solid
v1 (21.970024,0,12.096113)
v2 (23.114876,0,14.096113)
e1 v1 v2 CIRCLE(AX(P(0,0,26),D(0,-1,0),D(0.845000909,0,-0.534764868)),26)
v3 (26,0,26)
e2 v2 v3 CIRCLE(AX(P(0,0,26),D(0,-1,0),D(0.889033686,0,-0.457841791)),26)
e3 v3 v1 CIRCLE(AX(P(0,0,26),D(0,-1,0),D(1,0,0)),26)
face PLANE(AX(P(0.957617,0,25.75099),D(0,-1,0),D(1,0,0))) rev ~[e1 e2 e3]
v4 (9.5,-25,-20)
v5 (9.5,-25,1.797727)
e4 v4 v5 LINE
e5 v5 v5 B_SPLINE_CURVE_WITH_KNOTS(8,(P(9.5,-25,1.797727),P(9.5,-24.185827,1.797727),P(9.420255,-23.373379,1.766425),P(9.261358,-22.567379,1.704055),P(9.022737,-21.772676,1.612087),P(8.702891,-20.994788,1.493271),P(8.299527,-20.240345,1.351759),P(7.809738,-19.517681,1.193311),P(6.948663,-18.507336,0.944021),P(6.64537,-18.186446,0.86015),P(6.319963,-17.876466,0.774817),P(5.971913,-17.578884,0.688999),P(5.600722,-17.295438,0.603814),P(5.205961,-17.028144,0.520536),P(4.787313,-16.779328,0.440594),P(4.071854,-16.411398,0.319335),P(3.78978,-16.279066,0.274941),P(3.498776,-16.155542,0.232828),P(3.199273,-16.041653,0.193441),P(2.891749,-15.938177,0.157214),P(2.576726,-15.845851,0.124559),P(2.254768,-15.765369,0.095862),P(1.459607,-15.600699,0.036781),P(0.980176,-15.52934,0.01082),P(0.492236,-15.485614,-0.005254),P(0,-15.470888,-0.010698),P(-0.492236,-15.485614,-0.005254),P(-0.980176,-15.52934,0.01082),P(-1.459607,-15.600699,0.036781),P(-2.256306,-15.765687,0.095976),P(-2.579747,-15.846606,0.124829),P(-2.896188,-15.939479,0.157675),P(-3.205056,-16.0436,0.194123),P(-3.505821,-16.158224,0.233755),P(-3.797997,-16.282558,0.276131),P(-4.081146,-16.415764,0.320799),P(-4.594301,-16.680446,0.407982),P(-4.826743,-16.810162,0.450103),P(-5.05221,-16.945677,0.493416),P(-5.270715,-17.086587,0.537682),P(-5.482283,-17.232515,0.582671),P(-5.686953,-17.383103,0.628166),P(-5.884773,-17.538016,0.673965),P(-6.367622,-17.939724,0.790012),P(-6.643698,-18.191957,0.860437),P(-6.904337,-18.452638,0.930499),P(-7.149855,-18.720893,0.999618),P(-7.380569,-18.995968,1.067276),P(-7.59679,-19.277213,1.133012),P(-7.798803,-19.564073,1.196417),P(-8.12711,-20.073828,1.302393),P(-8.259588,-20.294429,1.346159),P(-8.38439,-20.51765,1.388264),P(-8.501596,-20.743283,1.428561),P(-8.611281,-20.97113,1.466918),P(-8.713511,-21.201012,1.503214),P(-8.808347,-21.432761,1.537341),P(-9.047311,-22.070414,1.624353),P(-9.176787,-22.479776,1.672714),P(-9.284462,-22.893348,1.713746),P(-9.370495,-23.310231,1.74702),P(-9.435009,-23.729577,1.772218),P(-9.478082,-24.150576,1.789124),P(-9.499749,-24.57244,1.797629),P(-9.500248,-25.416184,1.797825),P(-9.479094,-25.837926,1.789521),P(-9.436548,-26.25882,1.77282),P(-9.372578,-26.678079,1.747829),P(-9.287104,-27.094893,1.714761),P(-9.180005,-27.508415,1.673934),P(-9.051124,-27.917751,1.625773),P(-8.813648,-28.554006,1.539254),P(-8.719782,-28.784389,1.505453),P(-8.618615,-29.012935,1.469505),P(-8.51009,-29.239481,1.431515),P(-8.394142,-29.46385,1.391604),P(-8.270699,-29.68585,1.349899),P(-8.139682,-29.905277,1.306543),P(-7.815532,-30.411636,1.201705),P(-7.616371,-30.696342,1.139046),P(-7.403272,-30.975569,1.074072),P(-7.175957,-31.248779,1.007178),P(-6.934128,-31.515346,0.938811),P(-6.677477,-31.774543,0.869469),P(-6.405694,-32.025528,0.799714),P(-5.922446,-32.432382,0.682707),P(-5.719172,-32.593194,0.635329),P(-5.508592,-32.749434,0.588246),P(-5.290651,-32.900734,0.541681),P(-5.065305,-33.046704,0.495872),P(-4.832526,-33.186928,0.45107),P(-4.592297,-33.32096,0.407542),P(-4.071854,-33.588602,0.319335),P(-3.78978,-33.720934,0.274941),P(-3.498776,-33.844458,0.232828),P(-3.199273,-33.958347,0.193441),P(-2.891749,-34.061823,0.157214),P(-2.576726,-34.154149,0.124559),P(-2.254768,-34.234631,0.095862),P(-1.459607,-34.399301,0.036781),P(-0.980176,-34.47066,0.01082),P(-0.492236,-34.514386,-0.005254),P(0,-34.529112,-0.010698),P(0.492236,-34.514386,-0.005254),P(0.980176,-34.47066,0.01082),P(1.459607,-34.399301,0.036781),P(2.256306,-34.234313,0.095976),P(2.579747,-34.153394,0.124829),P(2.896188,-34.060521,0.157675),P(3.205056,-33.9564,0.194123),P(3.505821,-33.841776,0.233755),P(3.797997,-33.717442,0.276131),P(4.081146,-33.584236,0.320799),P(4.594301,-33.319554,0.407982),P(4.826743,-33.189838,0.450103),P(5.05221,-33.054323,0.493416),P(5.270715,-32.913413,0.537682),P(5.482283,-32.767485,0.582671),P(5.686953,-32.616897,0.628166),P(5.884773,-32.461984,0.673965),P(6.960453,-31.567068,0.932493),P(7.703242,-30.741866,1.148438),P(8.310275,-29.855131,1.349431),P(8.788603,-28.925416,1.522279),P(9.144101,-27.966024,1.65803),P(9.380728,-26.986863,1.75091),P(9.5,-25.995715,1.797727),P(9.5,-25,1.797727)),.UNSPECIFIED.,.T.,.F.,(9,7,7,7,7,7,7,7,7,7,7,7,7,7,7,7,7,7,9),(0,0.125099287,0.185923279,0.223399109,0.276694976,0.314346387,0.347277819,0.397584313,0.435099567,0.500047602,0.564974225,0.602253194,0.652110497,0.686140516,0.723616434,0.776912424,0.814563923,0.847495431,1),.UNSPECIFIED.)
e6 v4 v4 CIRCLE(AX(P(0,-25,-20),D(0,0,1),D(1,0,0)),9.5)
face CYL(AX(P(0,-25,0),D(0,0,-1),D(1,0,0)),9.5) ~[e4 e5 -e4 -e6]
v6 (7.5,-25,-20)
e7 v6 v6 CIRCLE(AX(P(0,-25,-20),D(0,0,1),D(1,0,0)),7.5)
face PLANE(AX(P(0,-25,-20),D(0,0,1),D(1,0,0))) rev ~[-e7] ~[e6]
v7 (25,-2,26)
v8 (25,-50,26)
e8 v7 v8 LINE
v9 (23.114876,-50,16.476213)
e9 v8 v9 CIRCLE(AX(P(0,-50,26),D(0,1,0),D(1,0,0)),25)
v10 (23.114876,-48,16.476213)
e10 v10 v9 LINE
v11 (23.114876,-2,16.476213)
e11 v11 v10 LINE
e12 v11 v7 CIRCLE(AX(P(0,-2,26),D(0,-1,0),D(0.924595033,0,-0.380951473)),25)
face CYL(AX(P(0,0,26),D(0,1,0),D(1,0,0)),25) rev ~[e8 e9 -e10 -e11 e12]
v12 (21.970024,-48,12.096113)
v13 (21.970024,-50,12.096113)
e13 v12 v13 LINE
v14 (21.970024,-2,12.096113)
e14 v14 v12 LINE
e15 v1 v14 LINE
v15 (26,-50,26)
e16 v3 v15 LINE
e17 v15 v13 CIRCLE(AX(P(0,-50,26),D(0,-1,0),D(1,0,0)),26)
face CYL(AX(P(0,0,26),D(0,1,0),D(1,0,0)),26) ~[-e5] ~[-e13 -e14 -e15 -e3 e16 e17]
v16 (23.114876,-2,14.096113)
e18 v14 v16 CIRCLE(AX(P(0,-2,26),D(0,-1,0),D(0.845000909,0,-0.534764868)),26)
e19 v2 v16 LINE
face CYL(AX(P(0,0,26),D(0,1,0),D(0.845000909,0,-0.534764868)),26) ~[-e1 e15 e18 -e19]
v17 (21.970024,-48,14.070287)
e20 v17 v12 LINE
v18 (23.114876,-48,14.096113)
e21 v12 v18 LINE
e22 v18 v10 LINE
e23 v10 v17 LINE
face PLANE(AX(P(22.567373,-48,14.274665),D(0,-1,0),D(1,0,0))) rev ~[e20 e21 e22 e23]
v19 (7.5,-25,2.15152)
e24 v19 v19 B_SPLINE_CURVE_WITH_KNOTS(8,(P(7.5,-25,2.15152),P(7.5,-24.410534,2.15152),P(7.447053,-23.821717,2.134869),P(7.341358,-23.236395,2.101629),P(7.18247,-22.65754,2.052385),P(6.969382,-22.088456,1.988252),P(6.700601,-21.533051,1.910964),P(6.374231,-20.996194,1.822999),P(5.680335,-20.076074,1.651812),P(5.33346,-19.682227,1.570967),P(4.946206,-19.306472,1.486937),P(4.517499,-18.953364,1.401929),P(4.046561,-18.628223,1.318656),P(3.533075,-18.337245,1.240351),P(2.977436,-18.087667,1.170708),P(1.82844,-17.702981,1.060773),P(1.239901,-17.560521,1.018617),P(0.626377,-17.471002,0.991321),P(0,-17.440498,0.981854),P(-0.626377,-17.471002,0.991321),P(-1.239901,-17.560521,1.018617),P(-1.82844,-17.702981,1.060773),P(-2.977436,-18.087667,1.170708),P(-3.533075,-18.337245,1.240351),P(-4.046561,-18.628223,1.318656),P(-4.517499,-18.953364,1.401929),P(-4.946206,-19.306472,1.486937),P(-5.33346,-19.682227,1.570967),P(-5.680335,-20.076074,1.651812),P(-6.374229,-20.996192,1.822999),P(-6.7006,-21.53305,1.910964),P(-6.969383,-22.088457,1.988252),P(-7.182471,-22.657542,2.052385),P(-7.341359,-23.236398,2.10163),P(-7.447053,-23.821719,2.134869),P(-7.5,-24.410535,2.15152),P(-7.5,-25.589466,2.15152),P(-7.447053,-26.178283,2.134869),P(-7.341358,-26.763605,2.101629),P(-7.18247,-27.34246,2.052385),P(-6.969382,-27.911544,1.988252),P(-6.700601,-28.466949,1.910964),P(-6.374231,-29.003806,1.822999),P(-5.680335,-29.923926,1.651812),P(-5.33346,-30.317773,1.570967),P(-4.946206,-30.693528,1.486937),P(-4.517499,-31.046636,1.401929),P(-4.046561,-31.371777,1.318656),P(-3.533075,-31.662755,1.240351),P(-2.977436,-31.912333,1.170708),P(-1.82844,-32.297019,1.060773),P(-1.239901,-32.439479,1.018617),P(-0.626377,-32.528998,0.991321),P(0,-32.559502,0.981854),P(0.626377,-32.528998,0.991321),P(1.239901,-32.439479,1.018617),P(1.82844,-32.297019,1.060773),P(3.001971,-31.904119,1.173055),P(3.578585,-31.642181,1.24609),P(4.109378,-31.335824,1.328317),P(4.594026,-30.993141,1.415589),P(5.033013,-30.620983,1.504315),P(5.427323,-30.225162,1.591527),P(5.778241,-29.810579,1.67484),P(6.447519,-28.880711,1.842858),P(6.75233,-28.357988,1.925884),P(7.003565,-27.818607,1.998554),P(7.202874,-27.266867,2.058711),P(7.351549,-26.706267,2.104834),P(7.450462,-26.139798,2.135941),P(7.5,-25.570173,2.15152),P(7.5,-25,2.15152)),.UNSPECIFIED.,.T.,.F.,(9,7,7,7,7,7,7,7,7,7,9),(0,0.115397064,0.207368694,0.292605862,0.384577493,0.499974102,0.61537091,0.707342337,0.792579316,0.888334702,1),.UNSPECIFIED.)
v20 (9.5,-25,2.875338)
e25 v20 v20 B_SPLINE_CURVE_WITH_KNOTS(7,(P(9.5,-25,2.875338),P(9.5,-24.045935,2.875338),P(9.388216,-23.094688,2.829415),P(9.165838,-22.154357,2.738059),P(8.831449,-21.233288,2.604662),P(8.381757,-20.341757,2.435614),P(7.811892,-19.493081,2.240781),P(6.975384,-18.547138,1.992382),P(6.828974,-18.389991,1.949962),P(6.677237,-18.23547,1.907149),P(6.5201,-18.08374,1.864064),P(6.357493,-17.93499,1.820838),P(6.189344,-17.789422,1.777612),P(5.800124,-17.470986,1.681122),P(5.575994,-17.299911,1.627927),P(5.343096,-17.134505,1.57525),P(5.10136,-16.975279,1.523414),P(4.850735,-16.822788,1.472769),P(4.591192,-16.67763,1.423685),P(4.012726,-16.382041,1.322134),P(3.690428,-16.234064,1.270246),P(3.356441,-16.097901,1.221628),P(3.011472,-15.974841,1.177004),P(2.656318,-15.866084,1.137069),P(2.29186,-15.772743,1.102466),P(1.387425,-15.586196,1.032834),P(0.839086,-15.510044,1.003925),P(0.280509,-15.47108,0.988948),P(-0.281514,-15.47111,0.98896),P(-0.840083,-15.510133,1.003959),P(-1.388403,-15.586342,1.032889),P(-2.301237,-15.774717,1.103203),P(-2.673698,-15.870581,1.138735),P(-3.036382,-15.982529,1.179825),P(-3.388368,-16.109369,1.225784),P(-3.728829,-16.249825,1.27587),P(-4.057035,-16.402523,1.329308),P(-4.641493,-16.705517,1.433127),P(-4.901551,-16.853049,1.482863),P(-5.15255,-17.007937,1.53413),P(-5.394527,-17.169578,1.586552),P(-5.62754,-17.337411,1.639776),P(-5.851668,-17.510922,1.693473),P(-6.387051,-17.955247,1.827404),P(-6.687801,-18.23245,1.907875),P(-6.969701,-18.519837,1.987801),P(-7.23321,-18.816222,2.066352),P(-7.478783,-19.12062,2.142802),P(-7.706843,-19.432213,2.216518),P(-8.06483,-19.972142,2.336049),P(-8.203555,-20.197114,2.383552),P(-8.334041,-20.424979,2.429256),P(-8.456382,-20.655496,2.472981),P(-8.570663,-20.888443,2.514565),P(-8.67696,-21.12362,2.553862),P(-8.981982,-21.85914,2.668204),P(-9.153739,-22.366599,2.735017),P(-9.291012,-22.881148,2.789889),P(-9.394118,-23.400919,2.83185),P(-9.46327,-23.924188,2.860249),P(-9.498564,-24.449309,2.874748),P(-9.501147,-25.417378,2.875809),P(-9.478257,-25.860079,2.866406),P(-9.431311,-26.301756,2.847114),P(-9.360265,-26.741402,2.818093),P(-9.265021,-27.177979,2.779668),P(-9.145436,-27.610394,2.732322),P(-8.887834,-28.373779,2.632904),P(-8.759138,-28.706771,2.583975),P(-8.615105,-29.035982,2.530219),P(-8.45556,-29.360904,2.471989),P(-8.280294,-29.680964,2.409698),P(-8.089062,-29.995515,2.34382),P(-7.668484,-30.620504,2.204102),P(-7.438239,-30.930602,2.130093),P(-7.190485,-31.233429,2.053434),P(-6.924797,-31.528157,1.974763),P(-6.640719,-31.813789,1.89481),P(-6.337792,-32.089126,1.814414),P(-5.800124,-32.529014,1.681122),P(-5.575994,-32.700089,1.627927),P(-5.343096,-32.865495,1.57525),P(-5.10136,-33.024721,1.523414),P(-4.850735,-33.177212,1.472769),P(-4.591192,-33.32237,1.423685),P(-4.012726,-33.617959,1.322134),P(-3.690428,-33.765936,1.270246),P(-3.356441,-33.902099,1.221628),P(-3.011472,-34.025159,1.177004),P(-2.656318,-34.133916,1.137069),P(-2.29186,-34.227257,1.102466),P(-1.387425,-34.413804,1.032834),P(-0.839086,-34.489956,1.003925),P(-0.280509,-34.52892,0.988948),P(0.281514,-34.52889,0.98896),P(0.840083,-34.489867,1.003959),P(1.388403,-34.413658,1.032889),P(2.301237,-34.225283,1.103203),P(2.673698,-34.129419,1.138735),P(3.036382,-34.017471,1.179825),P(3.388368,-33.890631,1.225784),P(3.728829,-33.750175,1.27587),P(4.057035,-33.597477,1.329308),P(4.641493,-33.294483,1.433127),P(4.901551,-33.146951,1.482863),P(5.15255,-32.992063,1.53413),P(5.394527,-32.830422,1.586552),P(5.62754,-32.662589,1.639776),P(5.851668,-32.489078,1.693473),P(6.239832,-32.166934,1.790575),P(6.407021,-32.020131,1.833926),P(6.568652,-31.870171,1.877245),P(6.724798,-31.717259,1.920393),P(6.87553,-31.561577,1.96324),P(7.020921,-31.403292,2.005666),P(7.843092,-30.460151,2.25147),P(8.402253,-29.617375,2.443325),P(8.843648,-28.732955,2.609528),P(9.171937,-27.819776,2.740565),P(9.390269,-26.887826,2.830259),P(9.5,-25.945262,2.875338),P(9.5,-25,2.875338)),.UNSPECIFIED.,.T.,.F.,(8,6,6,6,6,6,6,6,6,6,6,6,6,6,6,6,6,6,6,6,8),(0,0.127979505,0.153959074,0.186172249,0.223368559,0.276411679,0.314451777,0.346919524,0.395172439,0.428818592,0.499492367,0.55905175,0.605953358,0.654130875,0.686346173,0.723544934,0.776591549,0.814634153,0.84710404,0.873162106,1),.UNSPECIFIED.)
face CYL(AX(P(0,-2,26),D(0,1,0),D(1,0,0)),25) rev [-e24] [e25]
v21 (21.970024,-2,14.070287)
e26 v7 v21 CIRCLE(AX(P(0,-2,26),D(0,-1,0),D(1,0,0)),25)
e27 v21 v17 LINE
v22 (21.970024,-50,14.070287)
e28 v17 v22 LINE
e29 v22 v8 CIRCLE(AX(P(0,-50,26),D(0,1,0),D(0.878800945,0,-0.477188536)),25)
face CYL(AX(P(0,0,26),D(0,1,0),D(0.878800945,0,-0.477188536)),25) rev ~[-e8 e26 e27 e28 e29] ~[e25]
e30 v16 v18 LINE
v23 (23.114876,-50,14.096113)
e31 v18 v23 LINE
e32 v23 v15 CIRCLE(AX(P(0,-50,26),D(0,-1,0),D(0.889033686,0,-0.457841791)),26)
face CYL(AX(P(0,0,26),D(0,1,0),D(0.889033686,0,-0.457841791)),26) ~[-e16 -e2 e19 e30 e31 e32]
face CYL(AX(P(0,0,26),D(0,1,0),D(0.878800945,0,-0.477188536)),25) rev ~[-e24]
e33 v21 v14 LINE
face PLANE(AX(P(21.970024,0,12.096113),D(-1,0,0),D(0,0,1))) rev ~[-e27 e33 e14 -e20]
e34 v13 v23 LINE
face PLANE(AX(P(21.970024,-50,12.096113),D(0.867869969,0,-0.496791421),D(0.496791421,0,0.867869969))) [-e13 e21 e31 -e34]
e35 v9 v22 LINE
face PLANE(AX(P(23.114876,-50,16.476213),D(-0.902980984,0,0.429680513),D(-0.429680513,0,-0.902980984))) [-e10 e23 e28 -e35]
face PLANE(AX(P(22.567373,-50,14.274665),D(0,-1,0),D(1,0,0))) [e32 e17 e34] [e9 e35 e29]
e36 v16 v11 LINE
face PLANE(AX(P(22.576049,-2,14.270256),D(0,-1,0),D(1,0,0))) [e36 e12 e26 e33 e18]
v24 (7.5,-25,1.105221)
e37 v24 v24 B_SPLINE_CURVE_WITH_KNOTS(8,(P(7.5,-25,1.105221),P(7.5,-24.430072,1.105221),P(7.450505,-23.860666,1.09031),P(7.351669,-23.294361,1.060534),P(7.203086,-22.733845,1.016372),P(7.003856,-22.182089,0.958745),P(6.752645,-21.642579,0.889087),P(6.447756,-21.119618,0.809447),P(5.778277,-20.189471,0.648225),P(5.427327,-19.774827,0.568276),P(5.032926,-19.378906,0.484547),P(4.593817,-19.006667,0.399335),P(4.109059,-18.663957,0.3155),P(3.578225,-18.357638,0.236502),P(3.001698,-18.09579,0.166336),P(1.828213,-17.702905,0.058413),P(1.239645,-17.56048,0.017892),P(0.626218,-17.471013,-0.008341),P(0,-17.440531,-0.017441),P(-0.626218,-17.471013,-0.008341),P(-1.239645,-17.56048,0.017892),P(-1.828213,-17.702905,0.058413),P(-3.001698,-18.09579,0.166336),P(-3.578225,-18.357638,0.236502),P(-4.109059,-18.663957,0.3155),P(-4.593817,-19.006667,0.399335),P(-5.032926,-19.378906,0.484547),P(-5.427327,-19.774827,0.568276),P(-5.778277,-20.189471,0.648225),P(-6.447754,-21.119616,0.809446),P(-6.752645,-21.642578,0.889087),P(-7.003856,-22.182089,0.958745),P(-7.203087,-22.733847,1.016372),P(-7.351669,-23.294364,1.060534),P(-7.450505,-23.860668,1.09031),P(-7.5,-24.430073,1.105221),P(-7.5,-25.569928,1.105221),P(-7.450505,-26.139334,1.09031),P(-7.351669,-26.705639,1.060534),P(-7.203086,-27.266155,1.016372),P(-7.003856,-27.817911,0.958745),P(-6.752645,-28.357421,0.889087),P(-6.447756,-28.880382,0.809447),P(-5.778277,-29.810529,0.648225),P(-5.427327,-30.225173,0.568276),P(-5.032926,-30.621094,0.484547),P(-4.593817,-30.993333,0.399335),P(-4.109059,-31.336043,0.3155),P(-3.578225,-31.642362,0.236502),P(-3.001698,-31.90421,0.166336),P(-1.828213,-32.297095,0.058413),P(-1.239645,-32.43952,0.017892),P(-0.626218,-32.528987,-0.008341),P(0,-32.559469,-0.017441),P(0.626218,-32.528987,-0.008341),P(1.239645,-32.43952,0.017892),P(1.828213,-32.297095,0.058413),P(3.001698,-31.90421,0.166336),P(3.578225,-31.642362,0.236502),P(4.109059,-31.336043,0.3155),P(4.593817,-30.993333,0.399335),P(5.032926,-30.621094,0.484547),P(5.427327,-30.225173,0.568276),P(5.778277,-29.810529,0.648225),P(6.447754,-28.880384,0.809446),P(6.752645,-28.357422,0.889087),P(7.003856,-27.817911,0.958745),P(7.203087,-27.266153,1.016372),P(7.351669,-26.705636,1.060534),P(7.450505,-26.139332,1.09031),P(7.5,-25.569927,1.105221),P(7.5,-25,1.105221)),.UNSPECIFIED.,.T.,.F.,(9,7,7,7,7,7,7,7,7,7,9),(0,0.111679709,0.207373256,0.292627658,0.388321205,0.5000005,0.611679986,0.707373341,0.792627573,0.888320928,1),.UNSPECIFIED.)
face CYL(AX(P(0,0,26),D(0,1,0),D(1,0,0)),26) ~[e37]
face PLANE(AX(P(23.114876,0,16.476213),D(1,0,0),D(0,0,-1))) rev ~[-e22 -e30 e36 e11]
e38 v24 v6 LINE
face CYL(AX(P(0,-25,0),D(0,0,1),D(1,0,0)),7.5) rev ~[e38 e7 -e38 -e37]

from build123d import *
from build123d import SkipClean  # not in build123d's __all__

# Parameters (mm, degrees)
F1_DEPTH = 2
F2_DEPTH = 50
F3_R     = 9.5
F3_R_2   = 7.5
F4_DEPTH = 5
F5_DEPTH = 20
F6_DEPTH = 60
F8_DEPTH = 2


# Not quite as in the source:
# - a feature names something its author has since deleted; it is built from what else it names


with BuildPart() as f1:
    # F0 (on Front) → F1 (new body)
    with BuildSketch(Plane.XZ):
        with BuildLine():
            Line((21.9700236311, 14.0702866067), (21.9700236311, 12.0961134337))
            ThreePointArc((21.9700236311, 12.0961134337), (22.5646192045, 13.0834230481), (23.1148758296, 14.0961134337))
            Line((23.1148758296, 14.0961134337), (23.1148758296, 16.4762131806))
            ThreePointArc((23.1148758296, 16.4762131806), (22.5745245911, 15.2579871773), (21.9700236311, 14.0702866067))
        make_face()
        with BuildLine():
            ThreePointArc((25, 26), (-24.2306684883, 32.1542428138), (21.9700236311, 14.0702866067))
            ThreePointArc((21.9700236311, 14.0702866067), (22.5745245911, 15.2579871773), (23.1148758296, 16.4762131806))
            ThreePointArc((23.1148758296, 16.4762131806), (24.5241910747, 21.1457181654), (25, 26))
        make_face()
    extrude(amount=F1_DEPTH)

    # F0 (on Front) → F2 (join)
    with BuildSketch(Plane.XZ):
        with BuildLine():
            ThreePointArc((23.1148758296, 14.0961134337), (25.2684266583, 19.8757356184), (26, 26))
            ThreePointArc((26, 26), (-24.9721906769, 33.2380724503), (21.9700236311, 12.0961134337))
            Line((21.9700236311, 12.0961134337), (21.9700236311, 14.0702866067))
            ThreePointArc((21.9700236311, 14.0702866067), (-24.2306684883, 32.1542428138), (25, 26))
            ThreePointArc((25, 26), (24.5241910747, 21.1457181654), (23.1148758296, 16.4762131806))
            Line((23.1148758296, 16.4762131806), (23.1148758296, 14.0961134337))
        make_face()
    extrude(amount=F2_DEPTH)

    # F3 (on Top) → F4 (join)
    with BuildSketch(Plane.XY):
        with Locations((0, -25)):
            Circle(F3_R)
        with Locations((0, -25)):
            Circle(F3_R_2, mode=Mode.SUBTRACT)
    with SkipClean():  # cleaning this boolean's faces spoils the solid; the shape is the same uncleaned
        extrude(amount=F4_DEPTH)

    # F3 (on Top) → F5 (join)
    with BuildSketch(Plane.XY):
        with Locations((0, -25)):
            Circle(F3_R)
        with Locations((0, -25)):
            Circle(F3_R_2, mode=Mode.SUBTRACT)
    extrude(amount=-F5_DEPTH)

    # F6 (cut): a face of the model
    f6_faces = [f1.faces().sort_by_distance(p)[0] for p in [
        (0.0283286742, -2, 25.9851504248),
    ]]
    extrude(f6_faces, amount=F6_DEPTH, mode=Mode.SUBTRACT)

    # F7 (on face) → F8 (join)
    with BuildSketch(Plane.XZ.offset(50)):
        Polygon((23.1148758296, 16.4762131806), (21.9700236311, 14.0702866067), (21.9700236311, 12.0961134337), (23.1148758296, 14.0961134337), align=None)
    extrude(amount=-F8_DEPTH)


solid = f1.part
